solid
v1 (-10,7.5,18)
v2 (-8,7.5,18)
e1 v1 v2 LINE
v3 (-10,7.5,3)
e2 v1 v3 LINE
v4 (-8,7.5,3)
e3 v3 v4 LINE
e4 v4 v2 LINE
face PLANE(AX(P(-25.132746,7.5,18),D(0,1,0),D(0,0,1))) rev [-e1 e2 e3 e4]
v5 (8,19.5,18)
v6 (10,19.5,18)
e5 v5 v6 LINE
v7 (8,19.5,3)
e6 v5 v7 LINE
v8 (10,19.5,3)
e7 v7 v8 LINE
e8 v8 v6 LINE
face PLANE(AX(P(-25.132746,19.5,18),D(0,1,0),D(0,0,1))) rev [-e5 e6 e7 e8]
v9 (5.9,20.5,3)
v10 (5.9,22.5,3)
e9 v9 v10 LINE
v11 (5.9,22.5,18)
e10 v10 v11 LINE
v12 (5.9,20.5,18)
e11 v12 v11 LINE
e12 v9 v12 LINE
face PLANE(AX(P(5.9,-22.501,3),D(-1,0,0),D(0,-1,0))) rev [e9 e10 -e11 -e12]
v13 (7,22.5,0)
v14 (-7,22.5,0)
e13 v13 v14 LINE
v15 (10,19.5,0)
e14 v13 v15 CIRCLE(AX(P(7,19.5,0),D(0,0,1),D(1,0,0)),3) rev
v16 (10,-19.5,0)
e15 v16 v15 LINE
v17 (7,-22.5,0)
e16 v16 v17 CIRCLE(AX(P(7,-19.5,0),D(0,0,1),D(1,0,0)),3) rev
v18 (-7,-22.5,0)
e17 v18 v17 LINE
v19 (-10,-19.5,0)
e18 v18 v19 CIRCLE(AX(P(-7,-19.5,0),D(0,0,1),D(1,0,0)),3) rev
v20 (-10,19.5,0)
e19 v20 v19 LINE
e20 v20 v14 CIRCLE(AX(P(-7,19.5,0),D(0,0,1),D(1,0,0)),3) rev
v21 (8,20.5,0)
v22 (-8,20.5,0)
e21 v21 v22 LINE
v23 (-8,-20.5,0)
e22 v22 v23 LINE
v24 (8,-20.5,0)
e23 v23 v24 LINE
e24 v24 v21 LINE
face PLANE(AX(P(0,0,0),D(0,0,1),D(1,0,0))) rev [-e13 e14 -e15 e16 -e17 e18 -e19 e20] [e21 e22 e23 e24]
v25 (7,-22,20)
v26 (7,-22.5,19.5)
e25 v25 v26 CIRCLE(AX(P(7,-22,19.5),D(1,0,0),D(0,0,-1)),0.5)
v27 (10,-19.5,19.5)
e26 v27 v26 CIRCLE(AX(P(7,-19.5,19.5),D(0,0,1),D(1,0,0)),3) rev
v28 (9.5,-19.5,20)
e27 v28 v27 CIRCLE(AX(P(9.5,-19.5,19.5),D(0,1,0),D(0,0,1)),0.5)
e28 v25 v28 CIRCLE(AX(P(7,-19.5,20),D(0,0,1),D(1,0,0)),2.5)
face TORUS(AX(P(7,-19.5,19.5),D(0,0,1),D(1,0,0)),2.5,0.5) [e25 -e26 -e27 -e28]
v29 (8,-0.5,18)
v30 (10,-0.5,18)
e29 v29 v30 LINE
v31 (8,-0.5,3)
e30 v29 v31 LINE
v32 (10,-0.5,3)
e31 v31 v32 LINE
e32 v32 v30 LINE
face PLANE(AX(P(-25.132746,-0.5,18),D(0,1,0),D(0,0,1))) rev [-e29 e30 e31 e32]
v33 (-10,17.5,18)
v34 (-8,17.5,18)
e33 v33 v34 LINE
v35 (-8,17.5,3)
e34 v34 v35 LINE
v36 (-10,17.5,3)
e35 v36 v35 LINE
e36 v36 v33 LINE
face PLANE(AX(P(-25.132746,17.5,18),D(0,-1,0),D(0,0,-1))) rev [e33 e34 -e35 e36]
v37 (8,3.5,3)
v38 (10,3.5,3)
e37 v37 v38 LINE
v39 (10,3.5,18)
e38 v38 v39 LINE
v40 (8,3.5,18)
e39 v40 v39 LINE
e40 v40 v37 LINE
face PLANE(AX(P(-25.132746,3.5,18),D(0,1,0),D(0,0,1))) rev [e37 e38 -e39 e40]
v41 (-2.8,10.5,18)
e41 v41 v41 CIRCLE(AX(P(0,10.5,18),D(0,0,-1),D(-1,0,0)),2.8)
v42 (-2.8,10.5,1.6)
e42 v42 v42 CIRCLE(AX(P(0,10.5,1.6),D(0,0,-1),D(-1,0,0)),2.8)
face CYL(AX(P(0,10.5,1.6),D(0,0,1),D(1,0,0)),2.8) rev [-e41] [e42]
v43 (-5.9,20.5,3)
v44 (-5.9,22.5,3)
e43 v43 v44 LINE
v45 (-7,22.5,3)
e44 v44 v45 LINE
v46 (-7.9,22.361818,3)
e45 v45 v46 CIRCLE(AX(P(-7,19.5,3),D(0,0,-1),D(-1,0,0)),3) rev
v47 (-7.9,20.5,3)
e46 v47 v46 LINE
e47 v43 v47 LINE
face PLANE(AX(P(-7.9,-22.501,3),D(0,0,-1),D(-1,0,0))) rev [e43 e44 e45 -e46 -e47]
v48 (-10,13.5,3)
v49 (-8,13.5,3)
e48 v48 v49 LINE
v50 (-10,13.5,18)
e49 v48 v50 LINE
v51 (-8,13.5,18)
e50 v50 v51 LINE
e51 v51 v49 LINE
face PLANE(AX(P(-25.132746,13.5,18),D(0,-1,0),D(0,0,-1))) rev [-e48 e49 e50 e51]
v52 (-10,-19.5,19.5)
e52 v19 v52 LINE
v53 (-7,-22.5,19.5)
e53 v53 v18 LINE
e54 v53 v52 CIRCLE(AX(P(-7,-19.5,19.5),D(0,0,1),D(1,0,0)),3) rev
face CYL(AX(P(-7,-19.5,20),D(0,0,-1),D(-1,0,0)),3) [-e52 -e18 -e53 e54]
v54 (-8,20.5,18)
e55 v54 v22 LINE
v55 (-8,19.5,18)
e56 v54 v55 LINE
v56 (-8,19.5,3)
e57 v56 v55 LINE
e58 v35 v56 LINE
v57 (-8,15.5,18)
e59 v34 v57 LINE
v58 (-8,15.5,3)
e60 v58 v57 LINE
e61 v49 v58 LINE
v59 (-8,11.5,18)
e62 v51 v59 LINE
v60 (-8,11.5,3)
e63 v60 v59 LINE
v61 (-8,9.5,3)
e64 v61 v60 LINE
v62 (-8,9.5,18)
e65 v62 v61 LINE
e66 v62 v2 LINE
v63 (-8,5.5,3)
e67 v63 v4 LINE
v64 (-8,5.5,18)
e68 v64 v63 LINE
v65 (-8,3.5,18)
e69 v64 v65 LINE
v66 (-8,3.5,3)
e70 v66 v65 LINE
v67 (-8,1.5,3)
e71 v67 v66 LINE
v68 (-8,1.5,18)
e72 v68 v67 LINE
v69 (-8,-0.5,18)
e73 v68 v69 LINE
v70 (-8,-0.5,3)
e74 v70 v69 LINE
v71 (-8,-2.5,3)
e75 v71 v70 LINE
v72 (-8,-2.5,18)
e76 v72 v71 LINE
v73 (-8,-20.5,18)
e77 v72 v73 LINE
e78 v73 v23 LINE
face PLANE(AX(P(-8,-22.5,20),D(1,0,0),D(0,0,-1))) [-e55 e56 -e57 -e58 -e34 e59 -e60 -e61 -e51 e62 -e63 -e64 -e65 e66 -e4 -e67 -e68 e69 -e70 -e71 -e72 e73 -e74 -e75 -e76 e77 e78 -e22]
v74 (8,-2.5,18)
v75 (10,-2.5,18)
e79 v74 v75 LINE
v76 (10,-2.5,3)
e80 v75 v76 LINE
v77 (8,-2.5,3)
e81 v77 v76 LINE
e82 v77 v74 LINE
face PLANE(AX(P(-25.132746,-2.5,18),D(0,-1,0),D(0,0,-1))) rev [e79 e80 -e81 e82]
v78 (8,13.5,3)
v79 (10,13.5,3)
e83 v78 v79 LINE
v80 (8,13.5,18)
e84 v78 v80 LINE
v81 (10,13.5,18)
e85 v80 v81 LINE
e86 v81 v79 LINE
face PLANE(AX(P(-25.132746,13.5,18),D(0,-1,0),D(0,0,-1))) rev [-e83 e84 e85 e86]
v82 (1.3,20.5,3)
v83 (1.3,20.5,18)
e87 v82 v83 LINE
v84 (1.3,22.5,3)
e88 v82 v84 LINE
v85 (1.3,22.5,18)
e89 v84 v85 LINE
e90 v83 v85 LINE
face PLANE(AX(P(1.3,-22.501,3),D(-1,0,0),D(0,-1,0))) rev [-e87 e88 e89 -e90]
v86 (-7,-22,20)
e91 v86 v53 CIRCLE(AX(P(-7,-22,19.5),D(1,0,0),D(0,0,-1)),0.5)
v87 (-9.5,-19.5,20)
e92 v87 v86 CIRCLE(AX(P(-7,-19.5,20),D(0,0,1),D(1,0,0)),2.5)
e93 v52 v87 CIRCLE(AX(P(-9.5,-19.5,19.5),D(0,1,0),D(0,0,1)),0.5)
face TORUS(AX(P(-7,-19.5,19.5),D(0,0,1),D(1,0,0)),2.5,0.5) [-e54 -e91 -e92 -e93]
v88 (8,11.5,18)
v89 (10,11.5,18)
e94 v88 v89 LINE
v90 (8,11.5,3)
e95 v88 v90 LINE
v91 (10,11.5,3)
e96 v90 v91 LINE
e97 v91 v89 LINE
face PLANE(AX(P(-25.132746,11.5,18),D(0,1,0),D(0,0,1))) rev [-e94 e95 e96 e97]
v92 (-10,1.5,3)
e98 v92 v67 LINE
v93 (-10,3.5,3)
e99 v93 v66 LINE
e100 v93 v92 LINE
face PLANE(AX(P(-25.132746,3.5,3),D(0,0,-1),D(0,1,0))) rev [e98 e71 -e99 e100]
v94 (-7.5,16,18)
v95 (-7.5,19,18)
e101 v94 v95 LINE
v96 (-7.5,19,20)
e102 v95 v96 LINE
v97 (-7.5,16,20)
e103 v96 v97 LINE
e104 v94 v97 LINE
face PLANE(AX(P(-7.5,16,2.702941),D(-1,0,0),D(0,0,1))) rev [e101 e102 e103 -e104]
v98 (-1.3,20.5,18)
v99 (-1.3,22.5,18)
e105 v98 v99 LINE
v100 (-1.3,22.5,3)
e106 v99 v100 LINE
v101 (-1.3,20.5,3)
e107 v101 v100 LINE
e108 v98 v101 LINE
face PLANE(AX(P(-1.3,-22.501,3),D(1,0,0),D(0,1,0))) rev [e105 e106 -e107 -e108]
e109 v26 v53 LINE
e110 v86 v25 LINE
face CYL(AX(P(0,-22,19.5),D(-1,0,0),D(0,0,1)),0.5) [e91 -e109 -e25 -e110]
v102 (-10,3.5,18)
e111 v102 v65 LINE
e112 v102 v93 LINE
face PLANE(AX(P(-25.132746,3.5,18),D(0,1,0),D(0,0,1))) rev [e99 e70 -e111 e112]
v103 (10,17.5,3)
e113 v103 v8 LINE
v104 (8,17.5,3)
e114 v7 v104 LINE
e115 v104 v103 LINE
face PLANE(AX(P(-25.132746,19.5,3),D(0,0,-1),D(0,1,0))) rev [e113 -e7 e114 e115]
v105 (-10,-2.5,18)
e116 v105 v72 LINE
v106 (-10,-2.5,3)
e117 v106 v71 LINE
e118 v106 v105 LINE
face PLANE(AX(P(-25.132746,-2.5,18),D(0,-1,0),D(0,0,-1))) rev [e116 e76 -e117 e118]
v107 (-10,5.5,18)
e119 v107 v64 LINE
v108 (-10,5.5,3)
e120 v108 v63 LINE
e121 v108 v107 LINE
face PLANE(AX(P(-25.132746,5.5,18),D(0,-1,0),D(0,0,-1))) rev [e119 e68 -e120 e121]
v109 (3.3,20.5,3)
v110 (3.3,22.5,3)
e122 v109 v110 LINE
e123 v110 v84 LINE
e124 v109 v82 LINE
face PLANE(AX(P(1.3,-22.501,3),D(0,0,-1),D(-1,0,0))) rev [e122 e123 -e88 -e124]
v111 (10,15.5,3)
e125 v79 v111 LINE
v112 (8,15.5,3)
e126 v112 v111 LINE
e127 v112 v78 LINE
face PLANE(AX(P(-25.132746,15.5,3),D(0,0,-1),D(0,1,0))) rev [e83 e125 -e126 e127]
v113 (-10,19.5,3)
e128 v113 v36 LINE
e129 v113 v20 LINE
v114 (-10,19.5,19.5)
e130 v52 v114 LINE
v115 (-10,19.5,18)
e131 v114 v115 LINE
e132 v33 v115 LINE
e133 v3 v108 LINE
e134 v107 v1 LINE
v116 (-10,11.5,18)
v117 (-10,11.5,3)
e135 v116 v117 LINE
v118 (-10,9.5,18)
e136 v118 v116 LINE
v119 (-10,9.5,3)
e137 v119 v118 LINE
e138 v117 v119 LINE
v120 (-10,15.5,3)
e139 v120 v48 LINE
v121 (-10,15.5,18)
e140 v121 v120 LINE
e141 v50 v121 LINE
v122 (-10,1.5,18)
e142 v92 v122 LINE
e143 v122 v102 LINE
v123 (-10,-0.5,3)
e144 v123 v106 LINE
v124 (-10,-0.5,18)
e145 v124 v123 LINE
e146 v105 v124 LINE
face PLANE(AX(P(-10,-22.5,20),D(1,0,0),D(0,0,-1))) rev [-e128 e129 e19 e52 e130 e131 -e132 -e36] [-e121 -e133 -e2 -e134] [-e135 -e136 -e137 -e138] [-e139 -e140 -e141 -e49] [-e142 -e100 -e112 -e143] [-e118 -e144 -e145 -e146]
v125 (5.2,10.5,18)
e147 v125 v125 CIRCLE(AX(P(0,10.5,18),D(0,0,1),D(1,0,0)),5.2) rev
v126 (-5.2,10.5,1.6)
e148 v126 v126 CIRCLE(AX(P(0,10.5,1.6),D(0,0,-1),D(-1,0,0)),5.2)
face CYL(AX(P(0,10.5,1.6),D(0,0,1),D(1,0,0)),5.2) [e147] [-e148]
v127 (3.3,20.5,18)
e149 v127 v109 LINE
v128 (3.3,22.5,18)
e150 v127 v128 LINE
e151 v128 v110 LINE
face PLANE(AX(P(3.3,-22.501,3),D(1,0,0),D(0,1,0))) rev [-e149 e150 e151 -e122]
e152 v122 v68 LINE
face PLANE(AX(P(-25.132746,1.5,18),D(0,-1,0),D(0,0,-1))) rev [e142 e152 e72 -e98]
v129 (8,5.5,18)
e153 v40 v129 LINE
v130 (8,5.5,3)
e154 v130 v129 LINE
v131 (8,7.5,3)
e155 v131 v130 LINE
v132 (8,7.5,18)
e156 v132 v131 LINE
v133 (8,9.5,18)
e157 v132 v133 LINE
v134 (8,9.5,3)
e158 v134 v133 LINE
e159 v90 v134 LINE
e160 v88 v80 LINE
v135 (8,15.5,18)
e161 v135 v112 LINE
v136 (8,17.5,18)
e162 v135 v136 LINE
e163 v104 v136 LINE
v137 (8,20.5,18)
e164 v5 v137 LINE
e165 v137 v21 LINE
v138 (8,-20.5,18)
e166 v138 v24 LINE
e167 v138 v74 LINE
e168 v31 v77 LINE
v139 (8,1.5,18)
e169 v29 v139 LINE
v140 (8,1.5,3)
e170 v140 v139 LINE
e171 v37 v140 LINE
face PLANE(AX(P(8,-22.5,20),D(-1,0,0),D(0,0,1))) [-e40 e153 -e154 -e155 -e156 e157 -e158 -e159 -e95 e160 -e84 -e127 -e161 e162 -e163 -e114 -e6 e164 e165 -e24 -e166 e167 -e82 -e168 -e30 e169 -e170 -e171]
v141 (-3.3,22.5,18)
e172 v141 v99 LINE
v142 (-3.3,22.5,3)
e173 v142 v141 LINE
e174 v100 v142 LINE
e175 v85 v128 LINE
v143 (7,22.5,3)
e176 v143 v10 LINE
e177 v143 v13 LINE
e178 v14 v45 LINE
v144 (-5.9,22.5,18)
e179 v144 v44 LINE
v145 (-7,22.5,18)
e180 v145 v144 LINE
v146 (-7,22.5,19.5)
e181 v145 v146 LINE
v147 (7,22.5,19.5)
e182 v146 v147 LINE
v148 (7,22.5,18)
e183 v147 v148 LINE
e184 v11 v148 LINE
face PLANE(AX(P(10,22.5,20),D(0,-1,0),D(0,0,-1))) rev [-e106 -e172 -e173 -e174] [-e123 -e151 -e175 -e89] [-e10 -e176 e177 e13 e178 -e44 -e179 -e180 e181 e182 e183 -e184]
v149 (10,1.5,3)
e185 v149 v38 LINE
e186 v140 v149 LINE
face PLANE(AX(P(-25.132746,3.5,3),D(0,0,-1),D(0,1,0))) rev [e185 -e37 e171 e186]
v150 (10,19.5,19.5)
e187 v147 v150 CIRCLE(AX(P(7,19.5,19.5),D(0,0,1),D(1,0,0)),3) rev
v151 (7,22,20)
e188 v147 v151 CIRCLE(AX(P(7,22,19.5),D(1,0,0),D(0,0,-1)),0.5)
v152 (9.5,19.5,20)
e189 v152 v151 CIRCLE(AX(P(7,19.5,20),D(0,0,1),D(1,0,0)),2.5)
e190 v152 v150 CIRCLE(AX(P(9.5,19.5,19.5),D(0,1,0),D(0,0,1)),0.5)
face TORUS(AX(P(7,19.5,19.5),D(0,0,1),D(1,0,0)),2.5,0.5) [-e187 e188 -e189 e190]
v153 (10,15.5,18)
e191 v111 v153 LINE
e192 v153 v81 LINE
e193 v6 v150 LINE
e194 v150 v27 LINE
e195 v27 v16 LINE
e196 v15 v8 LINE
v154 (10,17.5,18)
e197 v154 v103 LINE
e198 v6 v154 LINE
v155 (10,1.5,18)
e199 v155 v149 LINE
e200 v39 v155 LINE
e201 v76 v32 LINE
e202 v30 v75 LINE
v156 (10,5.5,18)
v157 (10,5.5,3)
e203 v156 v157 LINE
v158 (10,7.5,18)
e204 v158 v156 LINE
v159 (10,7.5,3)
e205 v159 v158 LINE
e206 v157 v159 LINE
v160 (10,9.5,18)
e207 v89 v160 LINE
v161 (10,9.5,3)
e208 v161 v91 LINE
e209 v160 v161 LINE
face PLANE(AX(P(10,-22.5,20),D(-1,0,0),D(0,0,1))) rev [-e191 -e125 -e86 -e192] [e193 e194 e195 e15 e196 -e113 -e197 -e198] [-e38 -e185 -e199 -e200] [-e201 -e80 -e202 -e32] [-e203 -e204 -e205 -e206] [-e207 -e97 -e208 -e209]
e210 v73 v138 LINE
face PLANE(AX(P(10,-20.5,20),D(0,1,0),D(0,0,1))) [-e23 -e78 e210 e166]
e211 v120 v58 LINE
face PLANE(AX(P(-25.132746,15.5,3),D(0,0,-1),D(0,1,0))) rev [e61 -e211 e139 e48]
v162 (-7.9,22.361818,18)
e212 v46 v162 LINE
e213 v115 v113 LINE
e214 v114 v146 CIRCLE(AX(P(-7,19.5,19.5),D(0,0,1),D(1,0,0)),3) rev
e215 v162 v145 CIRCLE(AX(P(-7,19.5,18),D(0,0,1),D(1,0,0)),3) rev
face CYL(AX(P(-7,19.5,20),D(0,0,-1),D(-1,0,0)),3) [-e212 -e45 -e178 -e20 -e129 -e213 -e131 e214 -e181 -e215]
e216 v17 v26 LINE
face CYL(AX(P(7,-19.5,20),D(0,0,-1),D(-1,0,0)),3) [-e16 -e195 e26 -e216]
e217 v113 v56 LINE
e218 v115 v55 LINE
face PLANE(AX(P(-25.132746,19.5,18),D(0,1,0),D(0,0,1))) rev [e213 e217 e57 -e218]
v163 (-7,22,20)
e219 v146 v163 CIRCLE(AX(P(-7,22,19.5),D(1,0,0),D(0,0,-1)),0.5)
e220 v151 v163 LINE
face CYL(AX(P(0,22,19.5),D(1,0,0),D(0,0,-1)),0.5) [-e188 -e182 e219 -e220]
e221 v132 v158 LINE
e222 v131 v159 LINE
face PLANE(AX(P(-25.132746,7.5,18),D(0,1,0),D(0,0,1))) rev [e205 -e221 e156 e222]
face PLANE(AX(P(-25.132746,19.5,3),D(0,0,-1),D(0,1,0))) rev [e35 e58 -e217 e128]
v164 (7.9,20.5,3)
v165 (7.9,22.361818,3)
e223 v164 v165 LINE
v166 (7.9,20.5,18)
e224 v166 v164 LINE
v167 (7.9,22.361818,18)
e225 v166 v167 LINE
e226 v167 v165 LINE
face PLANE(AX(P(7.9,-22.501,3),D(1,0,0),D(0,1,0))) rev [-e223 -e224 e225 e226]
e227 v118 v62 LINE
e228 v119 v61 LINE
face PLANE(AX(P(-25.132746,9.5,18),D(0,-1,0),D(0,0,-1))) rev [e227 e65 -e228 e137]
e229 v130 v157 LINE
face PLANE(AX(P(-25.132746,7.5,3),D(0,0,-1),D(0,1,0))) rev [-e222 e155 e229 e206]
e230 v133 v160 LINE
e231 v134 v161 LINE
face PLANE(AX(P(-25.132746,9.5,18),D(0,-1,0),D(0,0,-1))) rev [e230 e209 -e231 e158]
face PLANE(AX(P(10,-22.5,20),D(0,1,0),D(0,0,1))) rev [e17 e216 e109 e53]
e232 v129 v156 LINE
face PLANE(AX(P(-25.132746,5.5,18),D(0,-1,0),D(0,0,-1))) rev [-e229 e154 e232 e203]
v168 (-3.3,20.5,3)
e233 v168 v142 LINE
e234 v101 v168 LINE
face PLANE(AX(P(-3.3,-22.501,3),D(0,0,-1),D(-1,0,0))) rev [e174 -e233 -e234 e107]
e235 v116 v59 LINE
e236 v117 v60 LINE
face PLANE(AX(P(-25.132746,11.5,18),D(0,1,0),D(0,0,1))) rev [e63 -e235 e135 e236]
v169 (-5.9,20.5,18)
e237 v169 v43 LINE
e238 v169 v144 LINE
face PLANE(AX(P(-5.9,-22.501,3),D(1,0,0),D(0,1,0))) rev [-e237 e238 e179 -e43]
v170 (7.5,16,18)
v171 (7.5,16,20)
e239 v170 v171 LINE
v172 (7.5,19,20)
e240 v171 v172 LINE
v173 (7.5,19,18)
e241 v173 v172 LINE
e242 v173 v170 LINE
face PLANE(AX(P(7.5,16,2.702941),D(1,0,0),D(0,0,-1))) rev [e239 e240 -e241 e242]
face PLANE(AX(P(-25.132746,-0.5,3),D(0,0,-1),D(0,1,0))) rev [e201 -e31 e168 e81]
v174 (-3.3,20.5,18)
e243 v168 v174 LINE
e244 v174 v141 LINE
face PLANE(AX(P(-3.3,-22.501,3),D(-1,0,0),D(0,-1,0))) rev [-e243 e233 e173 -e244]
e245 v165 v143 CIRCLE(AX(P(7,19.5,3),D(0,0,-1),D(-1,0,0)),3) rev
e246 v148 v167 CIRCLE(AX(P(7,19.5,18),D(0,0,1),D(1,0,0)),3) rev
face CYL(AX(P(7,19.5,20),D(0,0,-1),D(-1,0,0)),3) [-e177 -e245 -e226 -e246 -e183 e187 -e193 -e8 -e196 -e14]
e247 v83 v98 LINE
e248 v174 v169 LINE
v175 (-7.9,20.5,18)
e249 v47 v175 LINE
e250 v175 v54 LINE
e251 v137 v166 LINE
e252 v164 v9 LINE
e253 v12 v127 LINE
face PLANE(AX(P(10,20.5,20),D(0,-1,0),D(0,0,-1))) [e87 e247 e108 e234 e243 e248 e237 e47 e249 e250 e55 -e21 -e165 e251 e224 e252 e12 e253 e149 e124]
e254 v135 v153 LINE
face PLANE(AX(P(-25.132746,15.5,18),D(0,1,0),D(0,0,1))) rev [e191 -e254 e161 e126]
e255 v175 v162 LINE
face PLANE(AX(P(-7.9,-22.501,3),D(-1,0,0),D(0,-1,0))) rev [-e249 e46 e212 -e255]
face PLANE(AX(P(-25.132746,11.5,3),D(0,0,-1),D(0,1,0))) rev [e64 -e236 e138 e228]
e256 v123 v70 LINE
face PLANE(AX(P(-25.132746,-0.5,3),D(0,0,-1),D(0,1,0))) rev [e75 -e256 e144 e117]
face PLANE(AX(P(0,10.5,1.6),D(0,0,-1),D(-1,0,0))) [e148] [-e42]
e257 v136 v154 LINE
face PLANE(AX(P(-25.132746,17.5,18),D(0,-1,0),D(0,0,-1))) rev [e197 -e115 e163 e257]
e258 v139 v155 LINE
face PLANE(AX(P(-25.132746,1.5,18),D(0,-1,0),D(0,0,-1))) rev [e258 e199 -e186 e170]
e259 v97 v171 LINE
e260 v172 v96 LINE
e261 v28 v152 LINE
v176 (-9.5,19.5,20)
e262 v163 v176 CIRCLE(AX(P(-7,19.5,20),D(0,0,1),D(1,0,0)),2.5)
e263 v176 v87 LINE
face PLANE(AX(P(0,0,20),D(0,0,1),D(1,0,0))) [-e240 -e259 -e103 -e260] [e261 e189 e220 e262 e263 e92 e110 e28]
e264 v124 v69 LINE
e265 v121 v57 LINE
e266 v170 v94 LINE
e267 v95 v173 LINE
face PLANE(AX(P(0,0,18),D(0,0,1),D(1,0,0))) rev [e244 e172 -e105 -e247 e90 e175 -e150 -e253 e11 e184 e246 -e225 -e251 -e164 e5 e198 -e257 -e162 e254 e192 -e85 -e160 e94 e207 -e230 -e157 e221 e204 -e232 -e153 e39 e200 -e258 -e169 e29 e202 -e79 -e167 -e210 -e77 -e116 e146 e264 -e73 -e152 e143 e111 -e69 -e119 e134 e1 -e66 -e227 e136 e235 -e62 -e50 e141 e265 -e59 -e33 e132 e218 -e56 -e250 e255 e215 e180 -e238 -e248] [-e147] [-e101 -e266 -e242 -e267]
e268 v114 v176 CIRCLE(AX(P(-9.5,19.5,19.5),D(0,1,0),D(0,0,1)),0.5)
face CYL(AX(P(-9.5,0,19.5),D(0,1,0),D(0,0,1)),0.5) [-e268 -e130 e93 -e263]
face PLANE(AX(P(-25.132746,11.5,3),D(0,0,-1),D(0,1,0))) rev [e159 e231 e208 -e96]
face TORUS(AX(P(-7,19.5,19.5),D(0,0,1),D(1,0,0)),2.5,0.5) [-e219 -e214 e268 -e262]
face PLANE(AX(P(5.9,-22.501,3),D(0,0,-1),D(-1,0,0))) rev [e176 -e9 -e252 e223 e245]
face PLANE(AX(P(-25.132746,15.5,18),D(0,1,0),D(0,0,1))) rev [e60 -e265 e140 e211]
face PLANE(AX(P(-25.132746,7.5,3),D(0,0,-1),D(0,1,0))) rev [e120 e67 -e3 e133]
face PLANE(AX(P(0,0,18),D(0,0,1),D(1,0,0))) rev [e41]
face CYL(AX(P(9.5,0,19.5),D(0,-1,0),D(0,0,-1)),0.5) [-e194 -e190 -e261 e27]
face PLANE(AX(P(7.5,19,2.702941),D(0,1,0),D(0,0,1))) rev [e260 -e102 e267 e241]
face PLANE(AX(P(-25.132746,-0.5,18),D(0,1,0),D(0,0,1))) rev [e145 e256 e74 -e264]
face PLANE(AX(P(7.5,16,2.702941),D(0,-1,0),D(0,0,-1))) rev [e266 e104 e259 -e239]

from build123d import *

# Parameters (mm, degrees)
SKETCH2_W           = 20
SKETCH2_H           = 45
BOSS_EXTRUDE1_DEPTH = 20
SHELL1_T            = -2
CUT_EXTRUDE1_REACH  = 38.142
SKETCH3_W           = 15
SKETCH3_H           = 2
CUT_EXTRUDE2_REACH  = 52.249
SKETCH4_W           = 2
SKETCH4_H           = 15
FILLET1_R           = 3
SKETCH7_W           = 15
SKETCH7_H           = 3
CUT_EXTRUDE3_DEPTH  = 2
FILLET3_R           = 0.5
SKETCH8_R           = 5.2
SKETCH8_R_2         = 2.8
BOSS_EXTRUDE2_DEPTH = 16.4


with BuildPart() as part:
    # Sketch2 → Boss-Extrude1 (new body)
    with BuildSketch(Plane.XY):
        Rectangle(SKETCH2_W, SKETCH2_H)
    extrude(amount=BOSS_EXTRUDE1_DEPTH)

    # Shell1
    shell1_openings = [part.faces().sort_by_distance(p)[0] for p in [
        (0, 0, 0),
    ]]
    offset(amount=SHELL1_T, openings=shell1_openings, kind=Kind.INTERSECTION)

    # Cut-Extrude1: up to this face of the body (flat: up to its plane)
    cut_extrude1_end = Plane(part.part.faces().sort_by_distance((-10, 0, 10))[0])
    # Sketch3 → Cut-Extrude1 (cut, up to the picked face)
    with BuildSketch(Plane(origin=(10, 0, 0), x_dir=(0, 0, -1), z_dir=(1, 0, 0)), mode=Mode.PRIVATE) as cut_extrude1_sk1:
        with Locations((-10.5, 18.5)):
            Rectangle(SKETCH3_W, SKETCH3_H)
    cut_extrude1_tool1 = split(extrude(cut_extrude1_sk1.sketch, amount=-CUT_EXTRUDE1_REACH, mode=Mode.PRIVATE), bisect_by=cut_extrude1_end, keep=Keep.BOTH, mode=Mode.PRIVATE)
    # Sketch3 → Cut-Extrude1 (cut, up to the picked face)
    with BuildSketch(Plane(origin=(10, 0, 0), x_dir=(0, 0, -1), z_dir=(1, 0, 0)), mode=Mode.PRIVATE) as cut_extrude1_sk2:
        with Locations((-10.5, 14.5)):
            Rectangle(SKETCH3_W, SKETCH3_H)
    cut_extrude1_tool2 = split(extrude(cut_extrude1_sk2.sketch, amount=-CUT_EXTRUDE1_REACH, mode=Mode.PRIVATE), bisect_by=cut_extrude1_end, keep=Keep.BOTH, mode=Mode.PRIVATE)
    # Sketch3 → Cut-Extrude1 (cut, up to the picked face)
    with BuildSketch(Plane(origin=(10, 0, 0), x_dir=(0, 0, -1), z_dir=(1, 0, 0)), mode=Mode.PRIVATE) as cut_extrude1_sk3:
        with Locations((-10.5, 10.5)):
            Rectangle(SKETCH3_W, SKETCH3_H)
    cut_extrude1_tool3 = split(extrude(cut_extrude1_sk3.sketch, amount=-CUT_EXTRUDE1_REACH, mode=Mode.PRIVATE), bisect_by=cut_extrude1_end, keep=Keep.BOTH, mode=Mode.PRIVATE)
    # Sketch3 → Cut-Extrude1 (cut, up to the picked face)
    with BuildSketch(Plane(origin=(10, 0, 0), x_dir=(0, 0, -1), z_dir=(1, 0, 0)), mode=Mode.PRIVATE) as cut_extrude1_sk4:
        with Locations((-10.5, 6.5)):
            Rectangle(SKETCH3_W, SKETCH3_H)
    cut_extrude1_tool4 = split(extrude(cut_extrude1_sk4.sketch, amount=-CUT_EXTRUDE1_REACH, mode=Mode.PRIVATE), bisect_by=cut_extrude1_end, keep=Keep.BOTH, mode=Mode.PRIVATE)
    # Sketch3 → Cut-Extrude1 (cut, up to the picked face)
    with BuildSketch(Plane(origin=(10, 0, 0), x_dir=(0, 0, -1), z_dir=(1, 0, 0)), mode=Mode.PRIVATE) as cut_extrude1_sk5:
        with Locations((-10.5, 2.5)):
            Rectangle(SKETCH3_W, SKETCH3_H)
    cut_extrude1_tool5 = split(extrude(cut_extrude1_sk5.sketch, amount=-CUT_EXTRUDE1_REACH, mode=Mode.PRIVATE), bisect_by=cut_extrude1_end, keep=Keep.BOTH, mode=Mode.PRIVATE)
    # Sketch3 → Cut-Extrude1 (cut, up to the picked face)
    with BuildSketch(Plane(origin=(10, 0, 0), x_dir=(0, 0, -1), z_dir=(1, 0, 0)), mode=Mode.PRIVATE) as cut_extrude1_sk6:
        with Locations((-10.5, -1.5)):
            Rectangle(SKETCH3_W, SKETCH3_H)
    cut_extrude1_tool6 = split(extrude(cut_extrude1_sk6.sketch, amount=-CUT_EXTRUDE1_REACH, mode=Mode.PRIVATE), bisect_by=cut_extrude1_end, keep=Keep.BOTH, mode=Mode.PRIVATE)
    add(cut_extrude1_tool1.solids().sort_by(Axis((10, 18.5, 10.5), (-1, 0, 0)))[0], mode=Mode.SUBTRACT)
    add(cut_extrude1_tool2.solids().sort_by(Axis((10, 14.5, 10.5), (-1, 0, 0)))[0], mode=Mode.SUBTRACT)
    add(cut_extrude1_tool3.solids().sort_by(Axis((10, 10.5, 10.5), (-1, 0, 0)))[0], mode=Mode.SUBTRACT)
    add(cut_extrude1_tool4.solids().sort_by(Axis((10, 6.5, 10.5), (-1, 0, 0)))[0], mode=Mode.SUBTRACT)
    add(cut_extrude1_tool5.solids().sort_by(Axis((10, 2.5, 10.5), (-1, 0, 0)))[0], mode=Mode.SUBTRACT)
    add(cut_extrude1_tool6.solids().sort_by(Axis((10, -1.5, 10.5), (-1, 0, 0)))[0], mode=Mode.SUBTRACT)

    # Sketch4 → Cut-Extrude2 (cut, up to next)
    with BuildSketch(Plane(origin=(0, 22.5, 0), x_dir=(1, 0, 0), z_dir=(0, 1, 0)), mode=Mode.PRIVATE) as cut_extrude2_sk1:
        with Locations((-6.9, -10.5)):
            Rectangle(SKETCH4_W, SKETCH4_H)
    cut_extrude2_tool1 = extrude(cut_extrude2_sk1.sketch, amount=-CUT_EXTRUDE2_REACH, mode=Mode.PRIVATE) & part.part
    # Sketch4 → Cut-Extrude2 (cut, up to next)
    with BuildSketch(Plane(origin=(0, 22.5, 0), x_dir=(1, 0, 0), z_dir=(0, 1, 0)), mode=Mode.PRIVATE) as cut_extrude2_sk2:
        with Locations((-2.3, -10.5)):
            Rectangle(SKETCH4_W, SKETCH4_H)
    cut_extrude2_tool2 = extrude(cut_extrude2_sk2.sketch, amount=-CUT_EXTRUDE2_REACH, mode=Mode.PRIVATE) & part.part
    # Sketch4 → Cut-Extrude2 (cut, up to next)
    with BuildSketch(Plane(origin=(0, 22.5, 0), x_dir=(1, 0, 0), z_dir=(0, 1, 0)), mode=Mode.PRIVATE) as cut_extrude2_sk3:
        with Locations((2.3, -10.5)):
            Rectangle(SKETCH4_W, SKETCH4_H)
    cut_extrude2_tool3 = extrude(cut_extrude2_sk3.sketch, amount=-CUT_EXTRUDE2_REACH, mode=Mode.PRIVATE) & part.part
    # Sketch4 → Cut-Extrude2 (cut, up to next)
    with BuildSketch(Plane(origin=(0, 22.5, 0), x_dir=(1, 0, 0), z_dir=(0, 1, 0)), mode=Mode.PRIVATE) as cut_extrude2_sk4:
        with Locations((6.9, -10.5)):
            Rectangle(SKETCH4_W, SKETCH4_H)
    cut_extrude2_tool4 = extrude(cut_extrude2_sk4.sketch, amount=-CUT_EXTRUDE2_REACH, mode=Mode.PRIVATE) & part.part
    add(cut_extrude2_tool1.solids().sort_by_distance((-6.9, 22.5, 10.5))[0], mode=Mode.SUBTRACT)
    add(cut_extrude2_tool2.solids().sort_by_distance((-2.3, 22.5, 10.5))[0], mode=Mode.SUBTRACT)
    add(cut_extrude2_tool3.solids().sort_by_distance((2.3, 22.5, 10.5))[0], mode=Mode.SUBTRACT)
    add(cut_extrude2_tool4.solids().sort_by_distance((6.9, 22.5, 10.5))[0], mode=Mode.SUBTRACT)

    # Fillet1
    # the kernel refuses this fillet: 3 mm, written as the material it takes off along each edge
    with BuildSketch(Plane(origin=(10, -22.5, -7.5), x_dir=(-1, 0, 0), z_dir=(0, 0, 1)), Plane(origin=(10, 22.5, -7.5), x_dir=(0, -1, 0), z_dir=(0, 0, 1))) as fillet1_piece_1:
        with BuildLine():
            CenterArc((FILLET1_R, -FILLET1_R), FILLET1_R, 90, 90)
            Line((0, -FILLET1_R), (0, 0))
            Line((0, 0), (FILLET1_R, 0))
        make_face()
    extrude(amount=35, mode=Mode.SUBTRACT)
    with BuildSketch(Plane(origin=(-10, -22.5, -7.5), x_dir=(1, 0, 0), z_dir=(0, 0, 1)), Plane(origin=(-10, 22.5, -7.5), x_dir=(0, -1, 0), z_dir=(0, 0, 1))) as fillet1_piece_2:
        with BuildLine():
            CenterArc((FILLET1_R, FILLET1_R), FILLET1_R, 180, 90)
            Line((0, FILLET1_R), (0, 0))
            Line((0, 0), (FILLET1_R, 0))
        make_face()
    extrude(amount=35, mode=Mode.SUBTRACT)

    # Sketch7 → Cut-Extrude3 (cut)
    with BuildSketch(Plane.XY.offset(20)):
        with Locations((0, 17.5)):
            Rectangle(SKETCH7_W, SKETCH7_H)
    extrude(amount=-CUT_EXTRUDE3_DEPTH, mode=Mode.SUBTRACT)

    # Fillet3
    fillet3_edges = [part.edges().sort_by_distance(p)[0] for p in [
        (10, 0, 20),
        (0, -22.5, 20),
        (-10, 0, 20),
        (0, 22.5, 20),
        (9.121320344, 21.621320344, 20),
        (-9.121320344, 21.621320344, 20),
        (-9.121320344, -21.621320344, 20),
        (9.121320344, -21.621320344, 20),
    ]]
    fillet(fillet3_edges, radius=FILLET3_R)

    # Sketch8 → Boss-Extrude2 (add)
    with BuildSketch(Plane(origin=(0, 0, 18), x_dir=(-1, 0, 0), z_dir=(0, 0, -1))):
        with Locations(Location((0, 10.5, 0), (0, 0, 180))):
            Circle(SKETCH8_R)
        with Locations((0, 10.5)):
            Circle(SKETCH8_R_2, mode=Mode.SUBTRACT)
    extrude(amount=BOSS_EXTRUDE2_DEPTH)


solid = part.part
